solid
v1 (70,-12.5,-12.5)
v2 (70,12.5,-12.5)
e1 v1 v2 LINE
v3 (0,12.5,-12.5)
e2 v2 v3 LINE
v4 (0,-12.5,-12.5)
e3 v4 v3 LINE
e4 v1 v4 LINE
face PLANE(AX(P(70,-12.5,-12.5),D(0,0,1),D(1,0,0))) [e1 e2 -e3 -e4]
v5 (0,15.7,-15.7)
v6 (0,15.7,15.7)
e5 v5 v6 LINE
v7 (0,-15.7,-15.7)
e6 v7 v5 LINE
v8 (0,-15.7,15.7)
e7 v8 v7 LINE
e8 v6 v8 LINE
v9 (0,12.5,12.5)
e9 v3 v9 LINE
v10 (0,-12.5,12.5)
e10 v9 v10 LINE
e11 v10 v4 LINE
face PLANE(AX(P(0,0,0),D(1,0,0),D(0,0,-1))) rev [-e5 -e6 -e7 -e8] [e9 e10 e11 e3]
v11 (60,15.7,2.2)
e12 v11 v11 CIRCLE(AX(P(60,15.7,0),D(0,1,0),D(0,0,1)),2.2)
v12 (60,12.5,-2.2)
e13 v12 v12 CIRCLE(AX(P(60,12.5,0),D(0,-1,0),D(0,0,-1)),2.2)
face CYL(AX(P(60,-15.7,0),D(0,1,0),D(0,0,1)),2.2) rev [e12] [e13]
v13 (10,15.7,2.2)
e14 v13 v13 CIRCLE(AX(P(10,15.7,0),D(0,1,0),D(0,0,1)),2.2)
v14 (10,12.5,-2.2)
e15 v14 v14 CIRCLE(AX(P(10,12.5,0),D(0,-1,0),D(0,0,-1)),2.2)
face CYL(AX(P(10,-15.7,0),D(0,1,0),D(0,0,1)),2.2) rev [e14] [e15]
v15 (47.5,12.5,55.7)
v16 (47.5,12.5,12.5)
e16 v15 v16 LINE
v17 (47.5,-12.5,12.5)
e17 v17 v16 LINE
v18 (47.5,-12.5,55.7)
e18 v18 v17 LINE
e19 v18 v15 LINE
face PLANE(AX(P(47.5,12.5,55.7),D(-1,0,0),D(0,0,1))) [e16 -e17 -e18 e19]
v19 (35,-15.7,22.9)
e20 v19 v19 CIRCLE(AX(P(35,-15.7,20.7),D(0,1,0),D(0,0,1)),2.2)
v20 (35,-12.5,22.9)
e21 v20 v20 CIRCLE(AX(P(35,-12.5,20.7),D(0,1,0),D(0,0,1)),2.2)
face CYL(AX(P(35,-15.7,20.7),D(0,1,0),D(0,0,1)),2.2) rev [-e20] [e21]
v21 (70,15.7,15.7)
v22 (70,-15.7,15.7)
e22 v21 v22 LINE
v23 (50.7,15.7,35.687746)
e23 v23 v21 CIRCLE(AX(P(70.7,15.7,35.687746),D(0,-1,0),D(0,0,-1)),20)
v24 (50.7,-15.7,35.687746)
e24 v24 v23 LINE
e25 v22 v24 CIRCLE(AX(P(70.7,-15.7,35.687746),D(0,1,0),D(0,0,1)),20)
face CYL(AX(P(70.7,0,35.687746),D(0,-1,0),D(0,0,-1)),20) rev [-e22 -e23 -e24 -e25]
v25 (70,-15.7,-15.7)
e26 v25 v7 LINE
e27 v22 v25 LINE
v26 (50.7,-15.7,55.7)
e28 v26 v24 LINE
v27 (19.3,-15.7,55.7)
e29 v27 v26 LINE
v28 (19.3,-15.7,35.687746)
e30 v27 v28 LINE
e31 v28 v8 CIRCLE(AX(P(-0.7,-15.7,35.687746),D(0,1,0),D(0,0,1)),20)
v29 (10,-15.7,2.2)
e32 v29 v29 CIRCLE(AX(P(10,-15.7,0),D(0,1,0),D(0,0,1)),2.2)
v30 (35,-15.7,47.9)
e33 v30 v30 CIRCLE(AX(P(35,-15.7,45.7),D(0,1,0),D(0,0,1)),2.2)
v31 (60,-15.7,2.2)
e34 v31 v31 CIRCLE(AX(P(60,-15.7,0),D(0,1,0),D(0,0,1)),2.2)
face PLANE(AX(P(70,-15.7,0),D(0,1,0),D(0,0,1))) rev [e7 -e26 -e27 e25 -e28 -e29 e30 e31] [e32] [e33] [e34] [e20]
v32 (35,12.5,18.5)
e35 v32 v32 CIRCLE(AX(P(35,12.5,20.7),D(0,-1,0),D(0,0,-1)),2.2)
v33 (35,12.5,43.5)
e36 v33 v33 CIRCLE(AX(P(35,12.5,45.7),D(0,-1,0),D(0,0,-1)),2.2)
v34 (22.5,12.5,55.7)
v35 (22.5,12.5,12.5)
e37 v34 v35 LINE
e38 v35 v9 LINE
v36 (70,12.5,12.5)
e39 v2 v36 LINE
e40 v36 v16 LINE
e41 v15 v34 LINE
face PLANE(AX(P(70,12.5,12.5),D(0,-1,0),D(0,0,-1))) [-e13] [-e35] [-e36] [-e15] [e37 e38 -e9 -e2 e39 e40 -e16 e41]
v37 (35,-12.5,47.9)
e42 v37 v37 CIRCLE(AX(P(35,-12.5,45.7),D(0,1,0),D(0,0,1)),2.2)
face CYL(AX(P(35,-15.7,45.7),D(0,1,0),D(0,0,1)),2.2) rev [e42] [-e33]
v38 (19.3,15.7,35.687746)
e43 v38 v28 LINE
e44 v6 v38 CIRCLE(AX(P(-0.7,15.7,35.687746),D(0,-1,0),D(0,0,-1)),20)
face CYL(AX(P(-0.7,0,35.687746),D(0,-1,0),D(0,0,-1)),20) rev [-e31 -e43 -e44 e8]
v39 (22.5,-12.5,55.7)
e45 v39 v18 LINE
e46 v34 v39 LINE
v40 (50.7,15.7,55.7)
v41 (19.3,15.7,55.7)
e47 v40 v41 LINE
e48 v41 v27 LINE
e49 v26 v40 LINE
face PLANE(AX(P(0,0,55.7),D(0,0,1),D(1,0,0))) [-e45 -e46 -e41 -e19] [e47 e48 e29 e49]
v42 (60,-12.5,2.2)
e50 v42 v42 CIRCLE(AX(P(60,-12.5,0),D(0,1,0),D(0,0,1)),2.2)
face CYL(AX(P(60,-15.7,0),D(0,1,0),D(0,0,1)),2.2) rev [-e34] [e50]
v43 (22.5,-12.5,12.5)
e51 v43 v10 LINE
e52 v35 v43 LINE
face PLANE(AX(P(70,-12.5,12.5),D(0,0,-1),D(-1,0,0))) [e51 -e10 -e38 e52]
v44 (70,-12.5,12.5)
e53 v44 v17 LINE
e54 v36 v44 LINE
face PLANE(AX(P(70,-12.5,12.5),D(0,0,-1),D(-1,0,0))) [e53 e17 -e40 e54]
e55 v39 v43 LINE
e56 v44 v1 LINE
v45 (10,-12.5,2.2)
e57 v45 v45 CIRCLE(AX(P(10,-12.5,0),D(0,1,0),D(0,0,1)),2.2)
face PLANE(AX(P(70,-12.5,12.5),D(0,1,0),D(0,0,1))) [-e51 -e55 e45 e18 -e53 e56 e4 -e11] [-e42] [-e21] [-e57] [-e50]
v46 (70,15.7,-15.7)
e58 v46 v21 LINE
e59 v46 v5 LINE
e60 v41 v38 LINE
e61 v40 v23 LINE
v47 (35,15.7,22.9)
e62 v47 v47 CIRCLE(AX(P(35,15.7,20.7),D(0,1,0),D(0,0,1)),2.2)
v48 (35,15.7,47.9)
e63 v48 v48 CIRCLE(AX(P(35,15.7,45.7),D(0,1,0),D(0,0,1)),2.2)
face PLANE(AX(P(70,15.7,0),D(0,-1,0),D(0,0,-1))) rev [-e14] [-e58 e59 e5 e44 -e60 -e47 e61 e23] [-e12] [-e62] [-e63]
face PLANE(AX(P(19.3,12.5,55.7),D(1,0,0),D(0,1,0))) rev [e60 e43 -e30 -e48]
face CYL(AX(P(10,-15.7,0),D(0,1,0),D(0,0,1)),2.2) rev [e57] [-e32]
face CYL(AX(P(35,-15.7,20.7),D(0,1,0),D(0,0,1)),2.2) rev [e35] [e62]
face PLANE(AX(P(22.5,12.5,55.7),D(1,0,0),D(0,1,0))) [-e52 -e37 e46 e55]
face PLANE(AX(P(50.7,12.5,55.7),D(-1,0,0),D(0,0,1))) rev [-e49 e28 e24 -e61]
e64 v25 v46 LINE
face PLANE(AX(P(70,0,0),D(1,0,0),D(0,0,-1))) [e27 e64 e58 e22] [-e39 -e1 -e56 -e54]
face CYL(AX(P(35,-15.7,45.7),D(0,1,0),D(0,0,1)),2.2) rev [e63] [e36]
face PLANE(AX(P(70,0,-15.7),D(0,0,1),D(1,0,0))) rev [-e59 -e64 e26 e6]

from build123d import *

# Parameters (mm, degrees)
SKETCH_1_W          = 31.4
SKETCH_1_H          = 31.4
SKETCH_1_W_2        = 25
SKETCH_1_H_2        = 25
EXTRUDE_1_DEPTH     = 70
SKETCH_2_W          = 31.4
SKETCH_2_H          = 31.4
SKETCH_2_W_2        = 25
SKETCH_2_H_2        = 25
EXTRUDE_2_DEPTH     = 40
CUT_EXTRUDE_1_REACH = 84.137
SKETCH_3_W          = 25
SKETCH_3_H          = 25
FILLET_1_R          = 20
SKETCH_4_R          = 2.2
CUT_EXTRUDE_2_DEPTH = 95.807436417


with BuildPart() as part:
    # Эскиз1 → Вытянуть-Тонкостенный1 (new body)
    with BuildSketch(Plane(origin=(0, 0, 0), x_dir=(0, 0, -1), z_dir=(1, 0, 0))):
        Rectangle(SKETCH_1_W, SKETCH_1_H)
        Rectangle(SKETCH_1_W_2, SKETCH_1_H_2, mode=Mode.SUBTRACT)
    extrude(amount=EXTRUDE_1_DEPTH)

    # Эскиз2 → Вытянуть-Тонкостенный2 (add)
    with BuildSketch(Plane.XY.offset(15.7)):
        with Locations((35, 0)):
            Rectangle(SKETCH_2_W, SKETCH_2_H)
        with Locations((35, 0)):
            Rectangle(SKETCH_2_W_2, SKETCH_2_H_2, mode=Mode.SUBTRACT)
    extrude(amount=EXTRUDE_2_DEPTH)

    # Эскиз3 → Вырез-Вытянуть1 (cut, up to next)
    with BuildSketch(Plane.XY.offset(15.7), mode=Mode.PRIVATE) as cut_extrude_1_sk1:
        with Locations((35, 0)):
            Rectangle(SKETCH_3_W, SKETCH_3_H)
    cut_extrude_1_tool1 = extrude(cut_extrude_1_sk1.sketch, amount=-CUT_EXTRUDE_1_REACH, mode=Mode.PRIVATE) & part.part
    add(cut_extrude_1_tool1.solids().sort_by_distance((35, 0, 15.7))[0], mode=Mode.SUBTRACT)

    # Скругление1
    # the kernel refuses this fillet: 20 mm, written as the material it adds along each edge
    with BuildSketch(Plane(origin=(50.7, 15.7, 15.7), x_dir=(0, 0, 1), z_dir=(0, -1, 0))) as fillet_1_piece_1:
        with BuildLine():
            CenterArc((19.987746246, -20), FILLET_1_R, 90, 87.994238065)
            Line((0, -19.3), (-0.399754925, -19.286))
            ThreePointArc((-0.399754925, -19.286), (-0.4, -9.65), (-0.4, 0))
            Line((-0.4, 0), (0, 0.4))
            Line((0, 0.4), (19.987746246, 0.4))
            Line((19.987746246, 0.4), (19.987746246, 0))
        make_face()
    extrude(amount=31.4)
    with BuildSketch(Plane(origin=(19.3, -15.7, 15.7), x_dir=(-1, 0, 0), z_dir=(0, 1, 0))) as fillet_1_piece_2:
        with BuildLine():
            CenterArc((20, 19.987746246), FILLET_1_R, 180, 87.994238065)
            Line((0, 19.987746246), (-0.4, 19.987746246))
            Line((-0.4, 19.987746246), (-0.4, 0))
            Line((-0.4, 0), (0, -0.4))
            ThreePointArc((0, -0.4), (9.65, -0.4), (19.286, -0.399754925))
            Line((19.286, -0.399754925), (19.3, 0))
        make_face()
    extrude(amount=31.4)

    # Эскиз4 → Вырез-Вытянуть2 (cut, through all)
    with BuildSketch(Plane(origin=(0, 15.7, 0), x_dir=(1, 0, 0), z_dir=(0, 1, 0))):
        with Locations(Location((10, 0, 0), (0, 0, 270))):
            Circle(SKETCH_4_R)
        with Locations(Location((60, 0, 0), (0, 0, 270))):
            Circle(SKETCH_4_R)
        with Locations(Location((35, -45.7, 0), (0, 0, 270))):
            Circle(SKETCH_4_R)
        with Locations(Location((35, -20.7, 0), (0, 0, 270))):
            Circle(SKETCH_4_R)
    extrude(amount=-CUT_EXTRUDE_2_DEPTH, mode=Mode.SUBTRACT)


solid = part.part
